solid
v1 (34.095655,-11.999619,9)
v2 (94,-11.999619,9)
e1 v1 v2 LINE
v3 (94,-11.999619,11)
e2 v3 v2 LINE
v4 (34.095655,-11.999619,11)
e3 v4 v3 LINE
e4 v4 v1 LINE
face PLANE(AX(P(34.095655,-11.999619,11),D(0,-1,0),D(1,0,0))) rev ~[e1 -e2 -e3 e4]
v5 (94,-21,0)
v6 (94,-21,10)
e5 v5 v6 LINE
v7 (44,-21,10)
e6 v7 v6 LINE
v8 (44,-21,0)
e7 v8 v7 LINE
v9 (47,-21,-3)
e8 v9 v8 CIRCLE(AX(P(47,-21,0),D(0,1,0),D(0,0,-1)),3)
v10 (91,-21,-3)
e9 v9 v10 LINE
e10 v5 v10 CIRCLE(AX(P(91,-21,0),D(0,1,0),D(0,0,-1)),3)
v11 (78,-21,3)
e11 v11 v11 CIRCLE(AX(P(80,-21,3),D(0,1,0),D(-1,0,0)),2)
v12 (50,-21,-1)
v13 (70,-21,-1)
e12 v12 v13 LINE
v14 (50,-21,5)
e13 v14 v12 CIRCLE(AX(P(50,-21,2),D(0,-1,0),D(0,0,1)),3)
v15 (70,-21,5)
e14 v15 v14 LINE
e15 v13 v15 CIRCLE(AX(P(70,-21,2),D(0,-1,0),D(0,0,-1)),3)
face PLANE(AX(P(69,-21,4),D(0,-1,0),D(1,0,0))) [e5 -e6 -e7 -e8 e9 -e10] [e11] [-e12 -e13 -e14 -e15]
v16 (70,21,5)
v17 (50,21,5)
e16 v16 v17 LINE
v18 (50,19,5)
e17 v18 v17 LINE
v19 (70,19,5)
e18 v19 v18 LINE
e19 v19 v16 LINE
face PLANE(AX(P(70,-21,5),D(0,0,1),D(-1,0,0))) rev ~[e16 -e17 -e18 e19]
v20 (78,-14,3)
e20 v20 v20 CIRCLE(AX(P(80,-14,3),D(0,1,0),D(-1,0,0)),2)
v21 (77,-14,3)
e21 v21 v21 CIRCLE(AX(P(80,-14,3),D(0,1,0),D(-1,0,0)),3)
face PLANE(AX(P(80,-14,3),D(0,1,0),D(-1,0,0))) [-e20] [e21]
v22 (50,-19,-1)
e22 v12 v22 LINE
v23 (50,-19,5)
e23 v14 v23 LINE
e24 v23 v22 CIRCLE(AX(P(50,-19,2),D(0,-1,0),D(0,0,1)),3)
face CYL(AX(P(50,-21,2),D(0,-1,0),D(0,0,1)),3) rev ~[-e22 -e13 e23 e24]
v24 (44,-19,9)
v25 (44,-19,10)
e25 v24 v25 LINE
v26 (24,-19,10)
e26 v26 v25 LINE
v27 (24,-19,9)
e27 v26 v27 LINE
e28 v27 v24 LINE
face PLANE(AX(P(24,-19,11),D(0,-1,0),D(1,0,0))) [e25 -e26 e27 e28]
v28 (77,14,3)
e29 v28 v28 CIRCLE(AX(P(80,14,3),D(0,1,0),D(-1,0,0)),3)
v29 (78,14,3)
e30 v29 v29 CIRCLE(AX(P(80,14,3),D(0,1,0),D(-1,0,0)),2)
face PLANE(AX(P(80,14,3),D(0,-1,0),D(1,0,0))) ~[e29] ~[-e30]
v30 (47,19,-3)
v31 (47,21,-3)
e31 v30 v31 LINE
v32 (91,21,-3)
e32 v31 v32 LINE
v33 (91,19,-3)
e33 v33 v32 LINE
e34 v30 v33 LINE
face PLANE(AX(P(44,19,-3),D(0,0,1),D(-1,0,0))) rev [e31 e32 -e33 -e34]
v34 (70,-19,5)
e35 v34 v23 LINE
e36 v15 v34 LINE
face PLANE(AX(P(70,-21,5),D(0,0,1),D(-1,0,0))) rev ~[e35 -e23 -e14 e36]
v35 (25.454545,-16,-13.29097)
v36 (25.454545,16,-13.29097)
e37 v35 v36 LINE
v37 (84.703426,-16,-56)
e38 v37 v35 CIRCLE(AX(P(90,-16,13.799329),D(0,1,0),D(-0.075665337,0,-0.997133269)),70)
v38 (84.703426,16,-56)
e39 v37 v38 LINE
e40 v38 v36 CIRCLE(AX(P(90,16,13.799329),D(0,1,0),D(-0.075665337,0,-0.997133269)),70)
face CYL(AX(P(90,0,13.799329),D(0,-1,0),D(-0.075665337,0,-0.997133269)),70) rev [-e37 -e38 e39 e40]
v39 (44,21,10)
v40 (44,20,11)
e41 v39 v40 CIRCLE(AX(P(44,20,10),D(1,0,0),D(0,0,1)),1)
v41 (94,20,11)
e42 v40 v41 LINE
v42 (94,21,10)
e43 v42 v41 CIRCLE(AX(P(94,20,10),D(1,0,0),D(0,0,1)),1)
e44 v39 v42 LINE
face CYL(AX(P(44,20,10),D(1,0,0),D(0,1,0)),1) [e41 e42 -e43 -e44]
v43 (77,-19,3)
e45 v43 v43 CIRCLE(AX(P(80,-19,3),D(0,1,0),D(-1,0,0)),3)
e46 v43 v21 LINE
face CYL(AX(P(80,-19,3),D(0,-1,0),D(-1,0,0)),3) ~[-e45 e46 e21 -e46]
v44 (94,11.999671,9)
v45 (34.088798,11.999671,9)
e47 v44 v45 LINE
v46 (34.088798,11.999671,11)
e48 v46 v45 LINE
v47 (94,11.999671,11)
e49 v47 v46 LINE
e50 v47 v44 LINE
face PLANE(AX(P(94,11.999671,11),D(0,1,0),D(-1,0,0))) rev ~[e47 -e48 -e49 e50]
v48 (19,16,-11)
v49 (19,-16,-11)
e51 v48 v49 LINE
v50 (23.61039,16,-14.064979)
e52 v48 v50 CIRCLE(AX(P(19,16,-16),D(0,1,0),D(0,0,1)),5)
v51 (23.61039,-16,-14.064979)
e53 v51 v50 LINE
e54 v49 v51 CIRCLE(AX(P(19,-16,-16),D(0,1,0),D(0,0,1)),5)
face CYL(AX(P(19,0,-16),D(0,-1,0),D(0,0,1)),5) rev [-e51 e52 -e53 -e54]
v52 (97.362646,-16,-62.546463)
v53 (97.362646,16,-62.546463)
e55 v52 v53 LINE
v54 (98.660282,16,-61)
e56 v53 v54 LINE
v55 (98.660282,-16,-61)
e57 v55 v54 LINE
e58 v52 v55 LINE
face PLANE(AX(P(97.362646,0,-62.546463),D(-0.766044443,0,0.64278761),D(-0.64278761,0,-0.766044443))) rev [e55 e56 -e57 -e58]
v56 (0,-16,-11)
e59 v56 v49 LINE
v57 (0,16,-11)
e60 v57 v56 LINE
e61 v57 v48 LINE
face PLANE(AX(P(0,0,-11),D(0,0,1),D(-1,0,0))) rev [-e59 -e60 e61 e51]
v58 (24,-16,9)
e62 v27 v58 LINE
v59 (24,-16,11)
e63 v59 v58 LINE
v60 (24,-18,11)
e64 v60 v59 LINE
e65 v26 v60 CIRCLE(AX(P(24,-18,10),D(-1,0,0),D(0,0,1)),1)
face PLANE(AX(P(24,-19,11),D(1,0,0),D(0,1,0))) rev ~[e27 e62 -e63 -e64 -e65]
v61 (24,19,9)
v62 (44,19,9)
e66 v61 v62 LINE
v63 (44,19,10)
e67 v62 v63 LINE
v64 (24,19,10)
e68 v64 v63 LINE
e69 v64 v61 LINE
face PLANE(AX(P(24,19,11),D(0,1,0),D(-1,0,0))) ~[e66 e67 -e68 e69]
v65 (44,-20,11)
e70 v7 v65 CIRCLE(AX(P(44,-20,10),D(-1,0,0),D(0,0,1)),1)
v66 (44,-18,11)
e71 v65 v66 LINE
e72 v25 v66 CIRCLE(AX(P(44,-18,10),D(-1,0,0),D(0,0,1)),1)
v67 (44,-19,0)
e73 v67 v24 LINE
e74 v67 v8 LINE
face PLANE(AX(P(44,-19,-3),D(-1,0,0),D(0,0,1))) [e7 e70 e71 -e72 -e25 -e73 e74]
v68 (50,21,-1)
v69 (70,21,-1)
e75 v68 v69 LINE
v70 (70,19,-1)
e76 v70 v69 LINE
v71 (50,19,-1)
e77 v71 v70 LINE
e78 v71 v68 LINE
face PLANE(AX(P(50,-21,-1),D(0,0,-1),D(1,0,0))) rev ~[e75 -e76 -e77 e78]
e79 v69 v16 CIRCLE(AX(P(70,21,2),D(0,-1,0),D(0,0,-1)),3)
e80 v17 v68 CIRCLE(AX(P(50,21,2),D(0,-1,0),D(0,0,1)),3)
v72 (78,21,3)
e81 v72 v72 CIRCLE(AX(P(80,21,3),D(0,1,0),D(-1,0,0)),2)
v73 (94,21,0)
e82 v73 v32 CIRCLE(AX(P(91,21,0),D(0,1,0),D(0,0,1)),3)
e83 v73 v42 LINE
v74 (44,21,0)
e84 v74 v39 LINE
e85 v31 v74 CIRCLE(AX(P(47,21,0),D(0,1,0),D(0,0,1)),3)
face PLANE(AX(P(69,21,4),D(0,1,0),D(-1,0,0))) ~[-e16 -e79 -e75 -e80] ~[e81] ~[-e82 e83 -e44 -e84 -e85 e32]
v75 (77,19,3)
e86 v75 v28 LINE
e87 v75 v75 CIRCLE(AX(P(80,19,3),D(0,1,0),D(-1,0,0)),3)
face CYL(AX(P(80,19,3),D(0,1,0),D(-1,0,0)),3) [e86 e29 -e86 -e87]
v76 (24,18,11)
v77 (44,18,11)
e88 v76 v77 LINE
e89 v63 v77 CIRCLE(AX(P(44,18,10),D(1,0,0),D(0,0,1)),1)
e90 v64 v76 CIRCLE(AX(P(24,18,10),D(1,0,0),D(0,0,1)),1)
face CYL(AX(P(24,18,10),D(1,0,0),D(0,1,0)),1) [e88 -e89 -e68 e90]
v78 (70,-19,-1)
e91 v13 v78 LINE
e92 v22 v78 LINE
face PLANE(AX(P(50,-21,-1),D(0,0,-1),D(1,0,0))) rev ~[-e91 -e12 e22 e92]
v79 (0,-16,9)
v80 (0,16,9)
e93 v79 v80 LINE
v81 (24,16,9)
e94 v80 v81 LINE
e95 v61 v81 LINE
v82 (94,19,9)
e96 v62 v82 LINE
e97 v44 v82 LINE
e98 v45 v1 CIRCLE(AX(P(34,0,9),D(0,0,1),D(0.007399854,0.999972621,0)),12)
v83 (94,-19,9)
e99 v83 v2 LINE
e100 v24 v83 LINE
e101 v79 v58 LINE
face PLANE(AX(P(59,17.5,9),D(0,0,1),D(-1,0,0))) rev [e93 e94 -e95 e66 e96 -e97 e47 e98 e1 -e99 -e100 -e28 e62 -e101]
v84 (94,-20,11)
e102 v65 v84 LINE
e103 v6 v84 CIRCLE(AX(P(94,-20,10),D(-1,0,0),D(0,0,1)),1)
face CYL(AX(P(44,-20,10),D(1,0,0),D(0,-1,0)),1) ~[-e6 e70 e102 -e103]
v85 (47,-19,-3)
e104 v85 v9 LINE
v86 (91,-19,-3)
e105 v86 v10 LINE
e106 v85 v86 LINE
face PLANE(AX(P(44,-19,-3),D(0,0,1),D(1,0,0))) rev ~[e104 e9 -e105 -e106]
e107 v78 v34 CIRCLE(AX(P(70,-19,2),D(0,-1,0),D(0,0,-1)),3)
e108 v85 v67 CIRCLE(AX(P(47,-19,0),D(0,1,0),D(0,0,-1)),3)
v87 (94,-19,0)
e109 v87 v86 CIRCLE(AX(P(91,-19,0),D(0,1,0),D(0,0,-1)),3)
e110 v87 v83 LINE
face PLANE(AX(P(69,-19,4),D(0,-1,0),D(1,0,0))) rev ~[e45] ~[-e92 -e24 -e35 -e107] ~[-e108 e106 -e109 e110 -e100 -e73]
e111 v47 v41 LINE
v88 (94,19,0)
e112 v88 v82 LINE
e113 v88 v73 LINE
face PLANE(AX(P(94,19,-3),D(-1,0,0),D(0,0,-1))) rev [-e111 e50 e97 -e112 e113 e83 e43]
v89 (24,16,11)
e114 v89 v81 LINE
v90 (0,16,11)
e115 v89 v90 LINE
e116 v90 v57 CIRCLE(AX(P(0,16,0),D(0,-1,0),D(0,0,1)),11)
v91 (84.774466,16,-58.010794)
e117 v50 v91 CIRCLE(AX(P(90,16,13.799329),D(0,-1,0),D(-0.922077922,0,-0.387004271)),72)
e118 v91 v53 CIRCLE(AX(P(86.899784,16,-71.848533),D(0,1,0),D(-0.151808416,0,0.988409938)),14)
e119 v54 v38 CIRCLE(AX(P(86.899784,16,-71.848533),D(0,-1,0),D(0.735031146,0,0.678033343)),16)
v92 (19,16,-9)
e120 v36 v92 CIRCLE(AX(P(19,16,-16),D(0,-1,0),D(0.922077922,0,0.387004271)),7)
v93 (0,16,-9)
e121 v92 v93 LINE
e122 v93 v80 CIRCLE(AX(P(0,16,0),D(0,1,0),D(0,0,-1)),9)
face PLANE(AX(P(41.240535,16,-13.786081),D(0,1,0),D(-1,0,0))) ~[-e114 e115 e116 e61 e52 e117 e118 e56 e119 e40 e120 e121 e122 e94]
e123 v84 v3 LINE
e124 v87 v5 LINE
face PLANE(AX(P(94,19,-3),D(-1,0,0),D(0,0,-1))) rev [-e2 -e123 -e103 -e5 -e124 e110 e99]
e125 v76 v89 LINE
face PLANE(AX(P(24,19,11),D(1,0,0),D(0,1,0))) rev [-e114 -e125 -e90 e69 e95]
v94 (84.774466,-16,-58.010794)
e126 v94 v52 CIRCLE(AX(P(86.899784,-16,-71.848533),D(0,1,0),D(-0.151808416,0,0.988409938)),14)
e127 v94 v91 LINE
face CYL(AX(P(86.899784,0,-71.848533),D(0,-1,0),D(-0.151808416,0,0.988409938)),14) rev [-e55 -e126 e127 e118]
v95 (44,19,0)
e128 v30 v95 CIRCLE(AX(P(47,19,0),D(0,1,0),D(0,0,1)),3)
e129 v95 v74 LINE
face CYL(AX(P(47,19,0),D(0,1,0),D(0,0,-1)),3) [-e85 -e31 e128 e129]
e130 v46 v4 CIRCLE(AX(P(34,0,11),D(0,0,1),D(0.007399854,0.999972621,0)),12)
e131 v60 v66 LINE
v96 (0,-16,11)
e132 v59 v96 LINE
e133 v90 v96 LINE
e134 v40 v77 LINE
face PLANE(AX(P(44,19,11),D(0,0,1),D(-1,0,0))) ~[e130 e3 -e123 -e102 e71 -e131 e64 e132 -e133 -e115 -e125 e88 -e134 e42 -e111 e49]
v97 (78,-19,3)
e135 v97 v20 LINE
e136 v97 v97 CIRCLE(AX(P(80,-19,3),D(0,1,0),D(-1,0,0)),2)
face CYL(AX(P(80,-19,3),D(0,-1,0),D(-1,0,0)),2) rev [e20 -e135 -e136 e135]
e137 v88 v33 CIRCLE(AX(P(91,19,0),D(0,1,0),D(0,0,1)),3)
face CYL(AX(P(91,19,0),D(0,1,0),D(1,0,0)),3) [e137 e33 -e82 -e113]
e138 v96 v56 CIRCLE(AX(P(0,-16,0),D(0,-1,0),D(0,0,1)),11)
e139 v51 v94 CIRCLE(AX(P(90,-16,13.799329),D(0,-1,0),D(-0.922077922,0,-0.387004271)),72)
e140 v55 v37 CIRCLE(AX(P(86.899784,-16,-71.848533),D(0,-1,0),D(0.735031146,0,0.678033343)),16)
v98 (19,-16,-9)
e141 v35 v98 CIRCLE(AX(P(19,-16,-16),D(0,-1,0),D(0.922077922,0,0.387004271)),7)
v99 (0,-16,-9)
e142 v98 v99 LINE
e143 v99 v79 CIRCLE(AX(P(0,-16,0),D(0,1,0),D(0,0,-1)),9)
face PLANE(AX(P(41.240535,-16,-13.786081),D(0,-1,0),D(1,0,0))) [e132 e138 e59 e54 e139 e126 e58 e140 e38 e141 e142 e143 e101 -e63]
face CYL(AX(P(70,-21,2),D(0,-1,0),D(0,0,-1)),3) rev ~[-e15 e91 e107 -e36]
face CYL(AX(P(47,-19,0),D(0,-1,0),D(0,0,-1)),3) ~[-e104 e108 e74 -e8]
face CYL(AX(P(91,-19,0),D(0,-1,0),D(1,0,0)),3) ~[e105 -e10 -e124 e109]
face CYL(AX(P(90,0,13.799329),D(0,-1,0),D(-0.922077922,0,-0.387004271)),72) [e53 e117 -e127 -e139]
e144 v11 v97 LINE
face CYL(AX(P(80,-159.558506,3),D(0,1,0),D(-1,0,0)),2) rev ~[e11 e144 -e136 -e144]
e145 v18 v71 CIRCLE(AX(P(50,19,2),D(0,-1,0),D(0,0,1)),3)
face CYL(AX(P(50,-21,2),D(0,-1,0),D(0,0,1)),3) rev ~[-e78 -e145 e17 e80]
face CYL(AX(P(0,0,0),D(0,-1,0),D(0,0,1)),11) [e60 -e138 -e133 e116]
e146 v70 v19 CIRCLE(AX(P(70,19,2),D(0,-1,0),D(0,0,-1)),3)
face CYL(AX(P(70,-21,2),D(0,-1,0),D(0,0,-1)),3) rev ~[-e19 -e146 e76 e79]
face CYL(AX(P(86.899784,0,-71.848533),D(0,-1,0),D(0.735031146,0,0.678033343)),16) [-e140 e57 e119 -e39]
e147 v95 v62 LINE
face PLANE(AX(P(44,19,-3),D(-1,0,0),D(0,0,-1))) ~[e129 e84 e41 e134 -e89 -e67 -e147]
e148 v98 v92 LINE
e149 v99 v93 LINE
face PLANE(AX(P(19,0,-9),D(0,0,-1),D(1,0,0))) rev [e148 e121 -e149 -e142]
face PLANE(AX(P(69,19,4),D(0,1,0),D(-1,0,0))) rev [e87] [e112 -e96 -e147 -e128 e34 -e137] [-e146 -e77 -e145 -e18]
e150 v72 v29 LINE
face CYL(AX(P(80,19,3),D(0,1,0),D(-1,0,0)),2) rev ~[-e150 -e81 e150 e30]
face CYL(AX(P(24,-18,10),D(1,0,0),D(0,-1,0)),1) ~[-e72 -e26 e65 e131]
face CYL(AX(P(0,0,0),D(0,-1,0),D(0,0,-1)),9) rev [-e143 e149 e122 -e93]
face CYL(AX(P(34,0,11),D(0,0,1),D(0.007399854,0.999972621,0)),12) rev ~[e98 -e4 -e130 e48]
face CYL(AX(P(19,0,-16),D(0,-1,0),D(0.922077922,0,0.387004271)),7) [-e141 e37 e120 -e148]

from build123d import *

# Parameters (mm, degrees)
F1_DEPTH  = 16
F2_W      = 70
F2_H      = 3
F3_DEPTH  = 2
F4_W      = 50
F4_H      = 14
F5_DEPTH  = 2
F6_R      = 1
F9_DEPTH  = 2
F11_DEPTH = 42.001
F13_D     = 4
F14_R     = 3
F14_R_2   = 2
F15_DEPTH = 5
F16_R     = 3


# Not quite as in the source:
# - a pattern or mirror of a feature is missing from the dataset's text; its kind, count and spacing are read off the source's solid


with BuildPart() as f1:
    # F0 (on Front) → F1 (new body)
    with BuildSketch(Plane.XZ):
        with BuildLine():
            Line((94, 11), (0, 11))
            ThreePointArc((0, 11), (-11, 0), (0, -11))
            Line((0, -11), (19, -11))
            ThreePointArc((19, -11), (21.7681124643, -11.8361612201), (23.6103896104, -14.064978646))
            ThreePointArc((23.6103896104, -14.064978646), (47.9882051962, -44.6729645648), (84.7744660979, -58.0107943585))
            ThreePointArc((84.7744660979, -58.0107943585), (91.6454906811, -58.677418602), (97.362645896, -62.5464627931))
            Line((97.362645896, -62.5464627931), (98.6602822553, -61))
            ThreePointArc((98.6602822553, -61), (92.2959119196, -56.7859373435), (84.7034264019, -56))
            ThreePointArc((84.7034264019, -56), (49.0672193413, -42.9854179344), (25.4545454545, -13.2909701044))
            ThreePointArc((25.4545454545, -13.2909701044), (22.87535745, -10.1706257081), (19, -9))
            Line((19, -9), (0, -9))
            ThreePointArc((0, -9), (-9, 0), (0, 9))
            Line((0, 9), (94, 9))
            Line((94, 9), (94, 11))
        make_face()
    extrude(amount=F1_DEPTH)

    # F2 (on face) → F3 (join)
    with BuildSketch(Plane.XY.offset(11)):
        with Locations((59, -17.5)):
            Rectangle(F2_W, F2_H)
    extrude(amount=-F3_DEPTH)

    # F4 (on face) → F5 (join)
    with BuildSketch(Plane.XZ.offset(19)):
        with Locations((69, 4)):
            Rectangle(F4_W, F4_H)
    extrude(amount=F5_DEPTH)

    # F6
    f6_edges = [f1.edges().sort_by_distance(p)[0] for p in [
        (69, -21, 11),
        (34, -19, 11),
    ]]
    fillet(f6_edges, radius=F6_R)

    # F7: F1 across plane


with BuildPart() as f1_1:
    add(f1.part)
    add(f1.part.mirror(Plane.XZ))

    # F8 (on face) → F9 (cut)
    with BuildSketch(Plane.XY.offset(11)):
        with BuildLine():
            Line((94, 11.9996714485), (34.088798243, 11.9996714485))
            ThreePointArc((34.088798243, 11.9996714485), (22.0000004897, -0.003428249), (34.0956545385, -11.9996187527))
            Line((34.0956545385, -11.9996187527), (94, -11.9996187527))
            Line((94, -11.9996187527), (94, 11.9996714485))
        make_face()
    extrude(amount=-F9_DEPTH, mode=Mode.SUBTRACT)

    # F10 (on face) → F11 (cut, through all)
    with BuildSketch(Plane.XZ.offset(21)):
        with BuildLine():
            ThreePointArc((50, 5), (47, 2), (50, -1))
            Line((50, -1), (70, -1))
            ThreePointArc((70, -1), (73, 2), (70, 5))
            Line((70, 5), (50, 5))
        make_face()
    extrude(amount=-F11_DEPTH, mode=Mode.SUBTRACT)

    # F13 (through all)
    with Locations(Plane.XZ.offset(21)):
        with Locations((80, 3)):
            Hole(F13_D / 2)

    # F14 (on face) → F15 (join)
    with BuildSketch(Plane(origin=(0, -19, 0), x_dir=(-1, 0, 0), z_dir=(0, 1, 0))):
        with Locations((-80, 3)):
            Circle(F14_R)
        with Locations((-80, 3)):
            Circle(F14_R_2, mode=Mode.SUBTRACT)
    f15 = extrude(amount=F15_DEPTH)

    # F15_copies: F15 across plane
    add(f15.mirror(Plane.ZX))

    # F16
    f16_edges = [f1_1.edges().sort_by_distance(p)[0] for p in [
        (44, 20, -3),
        (94, 20, -3),
        (94, -20, -3),
        (44, -20, -3),
    ]]
    fillet(f16_edges, radius=F16_R)


solid = f1_1.part
